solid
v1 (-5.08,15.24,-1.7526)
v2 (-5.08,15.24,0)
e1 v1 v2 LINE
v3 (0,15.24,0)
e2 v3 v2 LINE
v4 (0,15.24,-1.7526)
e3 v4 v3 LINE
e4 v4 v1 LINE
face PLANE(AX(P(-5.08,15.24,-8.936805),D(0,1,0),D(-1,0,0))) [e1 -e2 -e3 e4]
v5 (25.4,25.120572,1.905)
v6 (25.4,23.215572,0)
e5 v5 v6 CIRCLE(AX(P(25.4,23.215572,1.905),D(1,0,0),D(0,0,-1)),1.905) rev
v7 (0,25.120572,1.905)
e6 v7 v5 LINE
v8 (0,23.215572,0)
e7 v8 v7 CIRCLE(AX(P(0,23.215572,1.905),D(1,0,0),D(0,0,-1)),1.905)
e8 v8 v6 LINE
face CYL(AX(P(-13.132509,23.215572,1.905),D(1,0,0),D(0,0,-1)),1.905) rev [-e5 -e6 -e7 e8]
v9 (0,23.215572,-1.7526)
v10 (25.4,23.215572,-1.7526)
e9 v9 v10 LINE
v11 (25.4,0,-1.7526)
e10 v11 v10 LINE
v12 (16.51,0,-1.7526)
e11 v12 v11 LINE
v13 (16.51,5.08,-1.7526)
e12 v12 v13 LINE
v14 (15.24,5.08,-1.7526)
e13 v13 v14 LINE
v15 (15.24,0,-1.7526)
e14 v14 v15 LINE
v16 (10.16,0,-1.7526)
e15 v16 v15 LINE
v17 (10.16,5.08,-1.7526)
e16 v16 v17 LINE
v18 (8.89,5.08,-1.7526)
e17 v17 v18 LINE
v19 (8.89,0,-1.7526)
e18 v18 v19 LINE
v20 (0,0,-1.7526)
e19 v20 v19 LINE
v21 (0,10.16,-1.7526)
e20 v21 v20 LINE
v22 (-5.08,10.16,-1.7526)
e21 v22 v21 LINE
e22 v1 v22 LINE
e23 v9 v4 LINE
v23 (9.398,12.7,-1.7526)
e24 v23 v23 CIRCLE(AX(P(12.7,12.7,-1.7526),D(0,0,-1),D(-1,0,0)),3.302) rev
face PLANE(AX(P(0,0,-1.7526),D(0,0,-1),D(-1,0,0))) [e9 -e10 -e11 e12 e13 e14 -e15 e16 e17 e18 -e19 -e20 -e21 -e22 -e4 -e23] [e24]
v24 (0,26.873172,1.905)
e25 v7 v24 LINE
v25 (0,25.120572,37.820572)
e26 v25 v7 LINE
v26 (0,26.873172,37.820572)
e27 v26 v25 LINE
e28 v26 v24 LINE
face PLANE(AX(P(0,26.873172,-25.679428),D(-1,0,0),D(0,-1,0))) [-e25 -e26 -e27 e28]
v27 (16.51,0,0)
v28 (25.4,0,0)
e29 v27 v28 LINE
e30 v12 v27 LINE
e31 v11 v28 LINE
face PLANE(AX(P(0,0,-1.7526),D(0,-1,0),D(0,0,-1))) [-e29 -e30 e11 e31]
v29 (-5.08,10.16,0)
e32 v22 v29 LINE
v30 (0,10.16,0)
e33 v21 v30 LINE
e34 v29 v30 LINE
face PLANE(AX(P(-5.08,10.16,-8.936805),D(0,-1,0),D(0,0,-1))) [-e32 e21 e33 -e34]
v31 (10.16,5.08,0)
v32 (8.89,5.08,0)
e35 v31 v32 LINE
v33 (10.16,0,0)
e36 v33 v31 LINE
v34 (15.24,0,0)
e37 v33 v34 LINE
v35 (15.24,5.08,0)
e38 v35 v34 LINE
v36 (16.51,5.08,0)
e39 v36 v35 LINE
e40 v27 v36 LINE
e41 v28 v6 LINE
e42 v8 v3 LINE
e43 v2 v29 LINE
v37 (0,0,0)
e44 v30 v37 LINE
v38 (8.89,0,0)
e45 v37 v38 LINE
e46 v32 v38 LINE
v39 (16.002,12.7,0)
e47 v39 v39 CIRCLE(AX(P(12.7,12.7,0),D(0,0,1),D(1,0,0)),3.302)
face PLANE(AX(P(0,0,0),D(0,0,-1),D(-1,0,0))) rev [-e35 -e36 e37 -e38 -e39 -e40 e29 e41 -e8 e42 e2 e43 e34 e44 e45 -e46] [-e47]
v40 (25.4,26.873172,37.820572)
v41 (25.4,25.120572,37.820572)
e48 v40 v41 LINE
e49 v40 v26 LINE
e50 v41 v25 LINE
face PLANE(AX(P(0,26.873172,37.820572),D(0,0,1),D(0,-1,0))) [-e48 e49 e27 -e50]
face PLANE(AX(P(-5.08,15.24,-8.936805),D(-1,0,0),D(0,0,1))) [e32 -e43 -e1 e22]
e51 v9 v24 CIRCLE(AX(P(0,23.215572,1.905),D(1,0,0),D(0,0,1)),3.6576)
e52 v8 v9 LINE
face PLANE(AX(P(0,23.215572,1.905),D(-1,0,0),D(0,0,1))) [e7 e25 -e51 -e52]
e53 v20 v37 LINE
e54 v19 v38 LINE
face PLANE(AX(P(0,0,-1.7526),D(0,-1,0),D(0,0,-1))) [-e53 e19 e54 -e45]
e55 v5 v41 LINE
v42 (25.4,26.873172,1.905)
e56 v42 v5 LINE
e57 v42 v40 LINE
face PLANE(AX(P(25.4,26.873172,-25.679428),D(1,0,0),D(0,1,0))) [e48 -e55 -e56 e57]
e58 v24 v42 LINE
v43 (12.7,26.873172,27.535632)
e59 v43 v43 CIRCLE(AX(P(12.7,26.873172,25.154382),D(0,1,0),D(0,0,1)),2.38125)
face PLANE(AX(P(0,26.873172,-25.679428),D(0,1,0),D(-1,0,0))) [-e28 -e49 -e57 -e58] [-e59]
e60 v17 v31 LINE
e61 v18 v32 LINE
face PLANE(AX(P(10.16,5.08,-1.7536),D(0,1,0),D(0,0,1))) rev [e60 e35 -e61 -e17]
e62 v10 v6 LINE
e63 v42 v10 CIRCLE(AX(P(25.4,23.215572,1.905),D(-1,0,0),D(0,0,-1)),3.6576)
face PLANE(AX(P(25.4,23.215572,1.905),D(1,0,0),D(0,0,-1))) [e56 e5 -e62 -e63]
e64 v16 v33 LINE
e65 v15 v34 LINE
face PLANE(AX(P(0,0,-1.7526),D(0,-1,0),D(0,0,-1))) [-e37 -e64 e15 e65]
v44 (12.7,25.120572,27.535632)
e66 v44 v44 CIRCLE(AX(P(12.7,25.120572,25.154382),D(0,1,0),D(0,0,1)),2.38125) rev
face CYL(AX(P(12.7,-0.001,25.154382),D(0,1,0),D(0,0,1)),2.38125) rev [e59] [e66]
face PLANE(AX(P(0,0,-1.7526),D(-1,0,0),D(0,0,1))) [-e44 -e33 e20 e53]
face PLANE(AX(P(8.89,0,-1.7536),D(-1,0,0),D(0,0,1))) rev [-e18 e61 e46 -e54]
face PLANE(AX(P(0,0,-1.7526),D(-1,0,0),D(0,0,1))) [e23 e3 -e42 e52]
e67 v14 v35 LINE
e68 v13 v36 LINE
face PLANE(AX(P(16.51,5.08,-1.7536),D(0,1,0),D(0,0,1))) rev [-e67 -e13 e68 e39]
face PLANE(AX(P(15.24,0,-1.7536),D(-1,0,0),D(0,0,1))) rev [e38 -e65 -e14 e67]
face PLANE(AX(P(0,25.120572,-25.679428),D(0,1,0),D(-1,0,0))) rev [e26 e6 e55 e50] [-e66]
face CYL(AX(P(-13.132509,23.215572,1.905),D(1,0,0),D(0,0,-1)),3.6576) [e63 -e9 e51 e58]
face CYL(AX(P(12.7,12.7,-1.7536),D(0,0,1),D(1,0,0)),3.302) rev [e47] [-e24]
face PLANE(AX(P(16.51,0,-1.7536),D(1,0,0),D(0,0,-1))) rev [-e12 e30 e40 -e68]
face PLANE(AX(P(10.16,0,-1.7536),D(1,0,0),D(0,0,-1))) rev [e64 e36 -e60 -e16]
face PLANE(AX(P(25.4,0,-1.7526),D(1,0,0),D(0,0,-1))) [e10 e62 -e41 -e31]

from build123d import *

# Parameters (mm, degrees)
SKETCH1_W              = 25.4
SKETCH1_H              = 63.5
BASE_FLANGE1_DEPTH     = 1.7526
SKETCHED_BEND1_DEPTH   = 25.4
SKETCHED_BEND1_2_DEPTH = 25.4
CUT_EXTRUDE2_REACH     = 54.894
SKETCH9_R              = 3.302
SKETCH9_W              = 1.27
SKETCH9_H              = 5.08
SKETCH10_W             = 5.08
SKETCH10_H             = 5.08
BOSS_EXTRUDE1_DEPTH    = 1.7526
CUT_EXTRUDE3_REACH     = 54.894
SKETCH11_R             = 2.38125


# Read off the part's stored shape, not the designer's step: Sketched Bend1
# Sheet-metal steps are written as plain solids
with BuildPart() as part:
    # Sketch1 → Base-Flange1 (new body)
    with BuildSketch(Plane.XY):
        with Locations((12.7, 31.75)):
            Rectangle(SKETCH1_W, SKETCH1_H)
    extrude(amount=-BASE_FLANGE1_DEPTH)

    # Sketched Bend1 outline → Sketched Bend1 (cut)
    with BuildSketch(Plane.YZ):
        with BuildLine():
            Line((63.5, 0), (26.337912998, 0))
            ThreePointArc((26.337912998, 0), (25.005866723, -1.284495709), (23.215572088, -1.7526))
            Line((23.215572088, -1.7526), (63.5, -1.7526))
            Line((63.5, -1.7526), (63.5, 0))
        make_face()
    extrude(amount=SKETCHED_BEND1_DEPTH, mode=Mode.SUBTRACT)

    # Sketched Bend1 2 outline → Sketched Bend1 2 (add)
    with BuildSketch(Plane.YZ):
        with BuildLine():
            Line((25.120572088, 37.820572088), (25.120572088, 1.905))
            ThreePointArc((25.120572088, 1.905), (24.562610506, 0.557961582), (23.215572088, 0))
            Line((23.215572088, 0), (26.337912998, 0))
            ThreePointArc((26.337912998, 0), (26.736815609, 0.915615432), (26.873172088, 1.905))
            Line((26.873172088, 1.905), (26.873172088, 37.820572088))
            Line((26.873172088, 37.820572088), (25.120572088, 37.820572088))
        make_face()
    extrude(amount=SKETCHED_BEND1_2_DEPTH)

    # Sketch9 → Cut-Extrude2 (cut, up to next)
    with BuildSketch(Plane.XY, mode=Mode.PRIVATE) as cut_extrude2_sk1:
        with Locations((12.7, 12.7)):
            Circle(SKETCH9_R)
    cut_extrude2_tool1 = extrude(cut_extrude2_sk1.sketch, amount=-CUT_EXTRUDE2_REACH, mode=Mode.PRIVATE) & part.part
    # Sketch9 → Cut-Extrude2 (cut, up to next)
    with BuildSketch(Plane.XY, mode=Mode.PRIVATE) as cut_extrude2_sk2:
        with Locations((15.875, 2.54)):
            Rectangle(SKETCH9_W, SKETCH9_H)
    cut_extrude2_tool2 = extrude(cut_extrude2_sk2.sketch, amount=-CUT_EXTRUDE2_REACH, mode=Mode.PRIVATE) & part.part
    # Sketch9 → Cut-Extrude2 (cut, up to next)
    with BuildSketch(Plane.XY, mode=Mode.PRIVATE) as cut_extrude2_sk3:
        with Locations((9.525, 2.54)):
            Rectangle(SKETCH9_W, SKETCH9_H)
    cut_extrude2_tool3 = extrude(cut_extrude2_sk3.sketch, amount=-CUT_EXTRUDE2_REACH, mode=Mode.PRIVATE) & part.part
    add(cut_extrude2_tool1.solids().sort_by_distance((12.7, 12.7, 0))[0], mode=Mode.SUBTRACT)
    add(cut_extrude2_tool2.solids().sort_by_distance((15.875, 2.54, 0))[0], mode=Mode.SUBTRACT)
    add(cut_extrude2_tool3.solids().sort_by_distance((9.525, 2.54, 0))[0], mode=Mode.SUBTRACT)

    # Sketch10 → Boss-Extrude1 (add)
    with BuildSketch(Plane.XY):
        with Locations((-2.54, 12.7)):
            Rectangle(SKETCH10_W, SKETCH10_H)
    extrude(amount=-BOSS_EXTRUDE1_DEPTH)

    # Sketch11 → Cut-Extrude3 (cut, up to next)
    with BuildSketch(Plane(origin=(0, 26.873172088, 0), x_dir=(1, 0, 0), z_dir=(0, 1, 0)), mode=Mode.PRIVATE) as cut_extrude3_sk1:
        with Locations(Location((12.7, -25.154382, 0), (0, 0, 270))):
            Circle(SKETCH11_R)
    cut_extrude3_tool1 = extrude(cut_extrude3_sk1.sketch, amount=-CUT_EXTRUDE3_REACH, mode=Mode.PRIVATE) & part.part
    add(cut_extrude3_tool1.solids().sort_by_distance((12.7, 26.873172, 25.154382))[0], mode=Mode.SUBTRACT)


solid = part.part
